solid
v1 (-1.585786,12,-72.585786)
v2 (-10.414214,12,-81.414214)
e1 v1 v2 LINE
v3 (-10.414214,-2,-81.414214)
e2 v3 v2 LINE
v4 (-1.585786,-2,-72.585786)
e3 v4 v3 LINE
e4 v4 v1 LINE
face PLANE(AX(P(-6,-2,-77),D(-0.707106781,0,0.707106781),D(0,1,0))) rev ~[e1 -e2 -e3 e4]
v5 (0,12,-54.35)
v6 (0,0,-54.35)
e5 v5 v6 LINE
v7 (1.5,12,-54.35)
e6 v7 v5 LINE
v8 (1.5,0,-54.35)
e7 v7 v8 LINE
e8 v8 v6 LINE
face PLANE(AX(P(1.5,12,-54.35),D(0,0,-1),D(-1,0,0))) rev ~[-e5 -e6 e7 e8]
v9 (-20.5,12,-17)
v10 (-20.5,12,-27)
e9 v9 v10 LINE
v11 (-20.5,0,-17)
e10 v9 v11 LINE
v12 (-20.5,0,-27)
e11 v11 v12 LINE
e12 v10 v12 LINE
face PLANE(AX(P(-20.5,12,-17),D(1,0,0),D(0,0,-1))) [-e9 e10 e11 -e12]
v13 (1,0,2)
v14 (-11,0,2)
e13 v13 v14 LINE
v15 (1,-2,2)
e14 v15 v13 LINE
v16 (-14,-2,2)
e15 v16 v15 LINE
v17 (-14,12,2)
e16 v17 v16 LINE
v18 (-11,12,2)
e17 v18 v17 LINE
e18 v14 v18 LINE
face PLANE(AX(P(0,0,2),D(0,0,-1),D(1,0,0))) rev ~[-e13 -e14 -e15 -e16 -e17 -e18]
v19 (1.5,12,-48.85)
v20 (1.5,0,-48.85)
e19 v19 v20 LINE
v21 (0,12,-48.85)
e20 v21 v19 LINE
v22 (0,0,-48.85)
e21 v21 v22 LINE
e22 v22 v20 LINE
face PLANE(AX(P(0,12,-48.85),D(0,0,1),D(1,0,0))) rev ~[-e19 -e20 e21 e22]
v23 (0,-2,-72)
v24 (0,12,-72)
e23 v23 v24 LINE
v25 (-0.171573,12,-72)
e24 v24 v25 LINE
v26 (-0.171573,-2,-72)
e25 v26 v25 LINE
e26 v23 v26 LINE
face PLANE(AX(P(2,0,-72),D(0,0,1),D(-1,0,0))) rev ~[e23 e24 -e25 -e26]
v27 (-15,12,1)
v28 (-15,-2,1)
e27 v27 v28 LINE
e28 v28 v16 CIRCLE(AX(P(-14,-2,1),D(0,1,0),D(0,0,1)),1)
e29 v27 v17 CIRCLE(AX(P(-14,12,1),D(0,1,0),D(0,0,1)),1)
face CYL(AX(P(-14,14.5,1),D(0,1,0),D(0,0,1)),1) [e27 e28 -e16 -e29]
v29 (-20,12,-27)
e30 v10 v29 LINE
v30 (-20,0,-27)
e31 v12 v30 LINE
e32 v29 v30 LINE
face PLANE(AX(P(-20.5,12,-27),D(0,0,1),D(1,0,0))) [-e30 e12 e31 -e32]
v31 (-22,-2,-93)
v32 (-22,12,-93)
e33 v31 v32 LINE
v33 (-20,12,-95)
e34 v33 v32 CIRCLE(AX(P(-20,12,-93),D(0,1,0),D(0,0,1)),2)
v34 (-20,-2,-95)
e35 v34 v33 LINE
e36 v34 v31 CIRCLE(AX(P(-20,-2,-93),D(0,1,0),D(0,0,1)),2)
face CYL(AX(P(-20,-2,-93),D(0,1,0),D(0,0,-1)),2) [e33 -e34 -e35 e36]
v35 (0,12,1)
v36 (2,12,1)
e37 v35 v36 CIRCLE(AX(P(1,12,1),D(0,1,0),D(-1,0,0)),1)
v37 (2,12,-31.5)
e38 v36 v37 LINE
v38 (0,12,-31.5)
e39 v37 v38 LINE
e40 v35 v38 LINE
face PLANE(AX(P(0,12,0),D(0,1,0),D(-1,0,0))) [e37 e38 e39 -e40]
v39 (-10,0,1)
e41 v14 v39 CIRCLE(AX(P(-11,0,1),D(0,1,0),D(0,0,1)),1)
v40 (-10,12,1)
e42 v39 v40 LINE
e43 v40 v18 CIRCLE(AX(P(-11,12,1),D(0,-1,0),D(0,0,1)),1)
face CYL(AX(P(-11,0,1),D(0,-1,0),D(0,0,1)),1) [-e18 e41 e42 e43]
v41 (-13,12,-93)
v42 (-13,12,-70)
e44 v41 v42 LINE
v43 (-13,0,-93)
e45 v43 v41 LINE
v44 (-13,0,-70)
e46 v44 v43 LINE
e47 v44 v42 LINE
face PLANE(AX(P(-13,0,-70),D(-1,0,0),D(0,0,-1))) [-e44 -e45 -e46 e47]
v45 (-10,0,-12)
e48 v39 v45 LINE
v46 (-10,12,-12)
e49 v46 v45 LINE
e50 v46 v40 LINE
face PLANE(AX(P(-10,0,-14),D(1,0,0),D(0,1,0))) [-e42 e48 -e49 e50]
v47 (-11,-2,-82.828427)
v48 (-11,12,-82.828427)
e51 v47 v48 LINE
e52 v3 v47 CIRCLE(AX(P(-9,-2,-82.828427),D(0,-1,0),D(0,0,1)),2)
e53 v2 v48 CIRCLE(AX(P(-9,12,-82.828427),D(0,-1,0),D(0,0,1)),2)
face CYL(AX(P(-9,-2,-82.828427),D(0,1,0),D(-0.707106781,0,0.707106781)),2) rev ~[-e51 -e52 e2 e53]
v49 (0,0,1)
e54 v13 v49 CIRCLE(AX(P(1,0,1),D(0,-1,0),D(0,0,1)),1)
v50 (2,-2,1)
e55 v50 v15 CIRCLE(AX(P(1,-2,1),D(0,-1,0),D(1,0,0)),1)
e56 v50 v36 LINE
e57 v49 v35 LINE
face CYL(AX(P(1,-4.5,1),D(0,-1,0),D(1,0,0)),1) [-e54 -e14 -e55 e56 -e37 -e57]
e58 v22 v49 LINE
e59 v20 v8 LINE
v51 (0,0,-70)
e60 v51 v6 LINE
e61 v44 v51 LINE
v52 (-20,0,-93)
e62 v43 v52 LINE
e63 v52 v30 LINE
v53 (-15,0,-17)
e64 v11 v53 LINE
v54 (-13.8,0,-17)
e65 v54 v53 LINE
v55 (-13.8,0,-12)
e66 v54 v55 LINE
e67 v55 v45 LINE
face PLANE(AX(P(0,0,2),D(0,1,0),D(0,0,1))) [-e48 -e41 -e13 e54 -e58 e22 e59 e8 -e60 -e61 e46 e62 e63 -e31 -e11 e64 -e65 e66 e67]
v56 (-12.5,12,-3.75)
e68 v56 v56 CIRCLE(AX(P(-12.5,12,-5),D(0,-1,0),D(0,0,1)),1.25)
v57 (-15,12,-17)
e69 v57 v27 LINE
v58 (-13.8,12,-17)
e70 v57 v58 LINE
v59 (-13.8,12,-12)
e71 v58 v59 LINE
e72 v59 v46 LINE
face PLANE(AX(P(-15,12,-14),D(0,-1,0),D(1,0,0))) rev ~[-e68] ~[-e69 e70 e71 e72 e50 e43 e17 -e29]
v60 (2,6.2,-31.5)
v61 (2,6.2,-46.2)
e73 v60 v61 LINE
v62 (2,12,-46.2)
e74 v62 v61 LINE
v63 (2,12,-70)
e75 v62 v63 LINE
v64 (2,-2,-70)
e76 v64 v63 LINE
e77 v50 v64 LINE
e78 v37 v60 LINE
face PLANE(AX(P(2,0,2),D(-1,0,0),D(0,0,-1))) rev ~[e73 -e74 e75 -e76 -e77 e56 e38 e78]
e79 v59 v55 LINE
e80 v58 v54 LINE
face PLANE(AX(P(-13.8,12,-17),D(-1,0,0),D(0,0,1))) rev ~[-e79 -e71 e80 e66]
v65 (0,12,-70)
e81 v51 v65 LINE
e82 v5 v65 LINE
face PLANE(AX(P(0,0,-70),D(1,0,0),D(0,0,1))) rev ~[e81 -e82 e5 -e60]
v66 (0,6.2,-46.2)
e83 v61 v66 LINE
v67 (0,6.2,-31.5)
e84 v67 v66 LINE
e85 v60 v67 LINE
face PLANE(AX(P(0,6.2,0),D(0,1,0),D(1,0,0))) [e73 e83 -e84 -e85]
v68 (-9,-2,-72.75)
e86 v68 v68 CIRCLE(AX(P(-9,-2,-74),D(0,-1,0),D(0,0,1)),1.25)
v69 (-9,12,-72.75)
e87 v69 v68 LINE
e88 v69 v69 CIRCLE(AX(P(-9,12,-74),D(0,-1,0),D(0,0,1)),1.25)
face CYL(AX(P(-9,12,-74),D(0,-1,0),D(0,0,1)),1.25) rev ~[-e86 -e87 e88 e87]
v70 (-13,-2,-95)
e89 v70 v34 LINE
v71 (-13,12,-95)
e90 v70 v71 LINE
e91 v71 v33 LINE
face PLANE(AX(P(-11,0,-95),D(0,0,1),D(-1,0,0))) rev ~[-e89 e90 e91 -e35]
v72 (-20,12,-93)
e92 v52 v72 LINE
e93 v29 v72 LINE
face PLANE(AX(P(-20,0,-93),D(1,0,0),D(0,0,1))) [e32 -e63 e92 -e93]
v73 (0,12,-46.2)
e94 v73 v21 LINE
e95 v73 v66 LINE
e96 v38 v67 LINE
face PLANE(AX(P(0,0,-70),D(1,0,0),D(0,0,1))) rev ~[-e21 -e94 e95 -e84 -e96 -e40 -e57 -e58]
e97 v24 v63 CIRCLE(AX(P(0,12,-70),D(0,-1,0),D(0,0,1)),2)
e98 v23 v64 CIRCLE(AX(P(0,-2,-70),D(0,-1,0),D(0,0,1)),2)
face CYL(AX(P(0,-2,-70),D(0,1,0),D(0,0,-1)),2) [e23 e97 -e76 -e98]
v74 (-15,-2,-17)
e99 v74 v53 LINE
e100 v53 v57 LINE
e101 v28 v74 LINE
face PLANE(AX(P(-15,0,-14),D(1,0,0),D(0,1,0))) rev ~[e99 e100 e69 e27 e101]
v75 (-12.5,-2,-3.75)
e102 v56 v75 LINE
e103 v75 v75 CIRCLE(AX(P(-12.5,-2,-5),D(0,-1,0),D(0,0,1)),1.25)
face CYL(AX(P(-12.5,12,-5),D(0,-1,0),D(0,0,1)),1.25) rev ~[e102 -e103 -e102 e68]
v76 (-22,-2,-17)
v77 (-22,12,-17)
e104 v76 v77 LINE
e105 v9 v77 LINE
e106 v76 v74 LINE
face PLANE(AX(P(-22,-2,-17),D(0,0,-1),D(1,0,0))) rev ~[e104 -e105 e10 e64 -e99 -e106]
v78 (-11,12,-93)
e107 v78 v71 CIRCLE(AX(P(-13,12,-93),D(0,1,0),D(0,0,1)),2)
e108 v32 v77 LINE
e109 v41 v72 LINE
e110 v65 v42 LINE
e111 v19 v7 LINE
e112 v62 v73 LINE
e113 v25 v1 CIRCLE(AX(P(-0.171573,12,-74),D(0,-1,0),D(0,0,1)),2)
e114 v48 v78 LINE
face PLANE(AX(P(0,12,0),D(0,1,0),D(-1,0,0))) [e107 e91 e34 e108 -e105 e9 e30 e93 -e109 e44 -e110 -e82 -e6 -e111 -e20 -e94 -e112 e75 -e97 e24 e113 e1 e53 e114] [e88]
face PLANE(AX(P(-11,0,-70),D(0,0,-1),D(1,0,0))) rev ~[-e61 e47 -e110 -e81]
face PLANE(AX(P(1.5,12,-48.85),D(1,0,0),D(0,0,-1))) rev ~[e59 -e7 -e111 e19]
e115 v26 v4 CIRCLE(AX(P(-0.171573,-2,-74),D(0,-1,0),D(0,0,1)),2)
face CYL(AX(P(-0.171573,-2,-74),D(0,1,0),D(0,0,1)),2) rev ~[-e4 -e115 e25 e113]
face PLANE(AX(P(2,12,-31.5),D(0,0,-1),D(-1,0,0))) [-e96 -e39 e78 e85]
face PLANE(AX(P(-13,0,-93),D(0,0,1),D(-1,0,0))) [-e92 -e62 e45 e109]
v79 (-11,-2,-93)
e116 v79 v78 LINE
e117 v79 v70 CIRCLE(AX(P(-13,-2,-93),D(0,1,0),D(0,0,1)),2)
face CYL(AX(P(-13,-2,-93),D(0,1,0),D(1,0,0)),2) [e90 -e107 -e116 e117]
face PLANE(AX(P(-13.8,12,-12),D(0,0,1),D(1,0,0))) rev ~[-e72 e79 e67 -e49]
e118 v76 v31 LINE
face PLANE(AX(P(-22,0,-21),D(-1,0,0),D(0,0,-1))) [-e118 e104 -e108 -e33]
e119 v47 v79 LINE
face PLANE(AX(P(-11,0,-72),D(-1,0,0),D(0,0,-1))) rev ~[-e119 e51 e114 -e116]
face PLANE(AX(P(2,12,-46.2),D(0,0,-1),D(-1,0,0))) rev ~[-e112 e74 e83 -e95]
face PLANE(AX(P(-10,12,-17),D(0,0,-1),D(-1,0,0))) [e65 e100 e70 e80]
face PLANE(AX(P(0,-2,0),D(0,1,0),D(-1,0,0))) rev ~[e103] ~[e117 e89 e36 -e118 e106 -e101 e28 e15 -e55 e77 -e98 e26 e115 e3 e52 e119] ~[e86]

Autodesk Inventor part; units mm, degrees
ref_plane "YZ Plane" through (0, 0, 0) normal (1, 0, 0) x (0, 1, 0)
ref_plane "XZ Plane" through (0, 0, 0) normal (0, 1, 0) x (-1, 0, 0)
ref_plane "XY Plane" through (0, 0, 0) normal (0, 0, 1) x (1, 0, 0)
sketch "Skizze1" plane through (0, 0, 0) normal (0, 1, 0) x (-1, 0, 0)
  line L0 (0, 0) -> (10, 0)
  line L1 (20, -14) -> (20, -70)
  line L2 (13, -70) -> (0, -70)
  line L3 (0, -70) -> (0, 0)
  line L4 (20, -70) -> (13, -70)
  line L5 (13, -70) -> (13, -93)
  line L6 (13, -93) -> (20, -93)
  line L7 (20, -93) -> (20, -70)
  line L8 (20, 0) -> (10, 0)
  line L9 (10, 0) -> (10, -14)
  line L10 (10, -14) -> (20, -14)
  line L11 (20, -14) -> (20, 0)
  line L12 (20, -12) -> (12, -12)
  line L13 (12, -12) -> (12, 0)
  line L14 (10, 2) -> (-2, 2)
  line L15 (-2, 2) -> (-2, -72)
  line L16 (-2, -72) -> (13, -72)
  line L17 (11, -70) -> (11, -95)
  line L18 (11, -95) -> (22, -95)
  line L19 (22, -95) -> (22, -70)
  line L20 (10, 2) -> (12, 2)
  line L21 (12, 2) -> (12, 0)
  line L22 (20, -12) -> (22, -12)
  line L23 (22, -12) -> (22, -70)
  line L24 (10, 0) -> (10, 2)
  line L25 (0, 0) -> (0, 2)
  line L26 (10, -14) -> (20, -14)
  line L27 (20, -14) -> (20, -21)
  line L28 (20, -21) -> (10, -21)
  line L29 (10, -21) -> (10, -14)
  line L30 (12, -12) -> (12, -14)
  line L31 (20, -21) -> (22, -21)
  line L32 (20, -14) -> (22, -14)
  line L33 (12, 2) -> (15, 2)
  line L34 (15, 2) -> (15, -14)
  line L35 (15, -14) -> (12, -14)
  line L36 (12, -14) -> (12, 2)
  line L37 (10, -14) -> (15, -14)
  line L38 (15, -14) -> (15, -21)
  line L39 (15, -21) -> (10, -21)
  line L40 (10, -21) -> (10, -14)
  point P0 (11, -72)
  dimension "d0" = 20
  dimension "d1" = 70
  dimension "d2" = 7
  dimension "d3" = 23
  dimension "d4" = 10
  dimension "d5" = 14
  dimension "d6" = 2
  dimension "d7" = 2
  dimension "d8" = 2
  dimension "d13" = 7
extrude "Extrusion1" add sketch "Skizze1" along normal blind 12 contours L3 L2 L17 L16 L15 L14 L25 | L24 L20 L21 L8 | L8 L13 L30 L10 L9 | L21 L33 L34 L8 | L8 L34 L12 L13 | L2 L5 L16 L17 | L12 L34 L10 L30 | L16 L5 L6 L7 L1 L31 L23 L19 L18 L17 | L32 L23 L31 L1
extrude "Extrusion3" add sketch "Skizze1" against normal blind 2 contours L25 L14 L24 L0 | L0 L9 L29 L28 L1 L4 L2 L3 | L3 L2 L17 L16 L15 L14 L25 | L24 L20 L21 L8 | L8 L13 L30 L10 L9 | L21 L33 L34 L8 | L8 L34 L12 L13 | L10 L38 L28 L29 | L2 L5 L16 L17 | L12 L34 L10 L30 | L4 L7 L6 L5 | L16 L5 L6 L7 L1 L31 L23 L19 L18 L17 | L10 L1 L28 L38 | L32 L23 L31 L1
chamfer "Fase1" distance 10 angle 45 1 edges at (-11, 5, -72)
fillet "Rundung1" radius 2 2 edges at (2, 5, -72) (-11, 5, -82)
fillet "Rundung2" radius 2 1 edges at (-1, 5, -72)
fillet "Rundung3" radius 2 2 edges at (-11, 5, -95) (-22, 5, -95)
fillet "Rundung4" radius 1 4 edges at (2, 5, 2) (0, 6, 2) (-10, 6, 2) (-15, 5, 2)
sketch "Skizze4" plane through (0, 12, 0) normal (0, 1, 0) x (1, 0, 0)
  line L0 (-13, 70) -> (0, 70) projected
  line L1 (2, -1) -> (2, 70) projected
  line L2 (0, 70) -> (2, 70)
  line L3 (2, 70) -> (2, 46.2)
  line L4 (2, 46.2) -> (0, 46.2)
  line L5 (0, 46.2) -> (0, 70)
  line L6 (0, 46.2) -> (2, 46.2)
  line L7 (2, 46.2) -> (2, 31.5)
  line L8 (2, 31.5) -> (0, 31.5)
  line L9 (0, 31.5) -> (0, 46.2)
  line L10 (0, 72) -> (-0.1716, 72) projected
  point P0 (0, 0)
  point P1 (2, 31.5)
  dimension "d24" = 14.7
  dimension "d56" = 23.8
extrude "Extrusion4" cut sketch "Skizze4" against normal blind 5.8 contours L8 L9 L4 L1
fillet "Rundung5" radius 1 1 edges at (-22, 5, -14)
sketch "Skizze5" plane through (0, -2, 0) normal (0, -1, 0) x (1, 0, 0)
  line L0 (-10, -14) -> (-15, -14) projected
  line L1 (-22, -15) -> (-22, -93) projected
  line L2 (-15, -14) -> (-22, -14)
  line L3 (-22, -14) -> (-22, -17)
  line L4 (-22, -17) -> (-15, -17)
  line L5 (-15, -17) -> (-15, -14)
  point P0 (0, 0)
  dimension "d28" = 3
extrude "Extrusion5" cut sketch "Skizze5" against normal through all
sketch "Skizze6" plane through (-10, 12, -14) normal (0, 0, -1) x (-1, 0, 0)
  line L0 (0, -12) -> (0, 0) projected
  line L1 (5, -12) -> (5, 0) projected
  line L2 (0, -12) -> (5, -12)
  line L3 (5, -12) -> (5, 0)
  line L4 (5, 0) -> (0, 0)
  line L5 (0, 0) -> (0, -12)
  point P0 (-10, -12)
extrude "Extrusion6" add sketch "Skizze6" along normal blind 3
sketch "Skizze7" plane through (0, 12, 0) normal (0, 1, 0) x (1, 0, 0)
  line L0 (-10, -1) -> (-10, 17) projected
  line L1 (-10, 17) -> (-13.8, 17)
  line L2 (-13.8, 17) -> (-13.8, 12)
  line L3 (-13.8, 12) -> (-10, 12)
  line L4 (-10, 12) -> (-10, 17)
  point P0 (0, 0)
  dimension "d34" = 5
  dimension "d35" = 3.8
extrude "Extrusion7" cut sketch "Skizze7" against normal up to surface (12 mm away)
sketch "Skizze8" plane through (0, 12, 0) normal (0, 1, 0) x (1, 0, 0)
  line L0 (-13, 70) -> (0, 70) projected
  line L1 (-13, 93) -> (-13, 70) projected
  point P0 (0, 0)
  point P1 (-9, 74)
  dimension "d38" = 4
  dimension "d39" = 4
hole "Bohrung1" at (-9, 12, -74) direction (0, -1, 0) diameter 2.5 end through all
sketch "Skizze9" plane through (0, 12, 0) normal (0, 1, 0) x (1, 0, 0)
  line L0 (-10, -1) -> (-10, 12) projected
  line L1 (-14, -2) -> (-11, -2) projected
  point P0 (0, 0)
  point P1 (-12.5, 5)
  dimension "d47" = 2.5
  dimension "d48" = 7
hole "Bohrung2" at (-12.5, 12, -5) direction (0, -1, 0) diameter 2.5 end through all
sketch "Skizze10" plane through (0, 12, 0) normal (0, 1, 0) x (1, 0, 0)
  line L0 (0, 70) -> (0, 46.2) projected
  line L1 (0, 48.85) -> (1.5, 48.85)
  line L2 (1.5, 48.85) -> (1.5, 54.35)
  line L3 (1.5, 54.35) -> (0, 54.35)
  line L4 (0, 54.35) -> (0, 48.85)
  line L5 (-13, 70) -> (0, 70) projected
  point P0 (0, 0)
  point P1 (0, 54.35)
  dimension "d58" = 5.5
  dimension "d59" = 1.5
  dimension "d60" = 15.65
extrude "Extrusion8" cut sketch "Skizze10" against normal up to surface (12 mm away)
sketch "Skizze11" plane through (0, 12, 0) normal (0, 1, 0) x (1, 0, 0)
  line L0 (-20, 17) -> (-20, 93) projected
  line L1 (-20, 17) -> (-20.5, 17)
  line L2 (-20.5, 17) -> (-20.5, 27)
  line L3 (-20.5, 27) -> (-20, 27)
  line L4 (-20, 27) -> (-20, 17)
  point P0 (0, 0)
  dimension "d63" = 0.5
  dimension "d64" = 10
extrude "Extrusion9" cut sketch "Skizze11" against normal up to surface (12 mm away)
properties part number "Case_DIP"
